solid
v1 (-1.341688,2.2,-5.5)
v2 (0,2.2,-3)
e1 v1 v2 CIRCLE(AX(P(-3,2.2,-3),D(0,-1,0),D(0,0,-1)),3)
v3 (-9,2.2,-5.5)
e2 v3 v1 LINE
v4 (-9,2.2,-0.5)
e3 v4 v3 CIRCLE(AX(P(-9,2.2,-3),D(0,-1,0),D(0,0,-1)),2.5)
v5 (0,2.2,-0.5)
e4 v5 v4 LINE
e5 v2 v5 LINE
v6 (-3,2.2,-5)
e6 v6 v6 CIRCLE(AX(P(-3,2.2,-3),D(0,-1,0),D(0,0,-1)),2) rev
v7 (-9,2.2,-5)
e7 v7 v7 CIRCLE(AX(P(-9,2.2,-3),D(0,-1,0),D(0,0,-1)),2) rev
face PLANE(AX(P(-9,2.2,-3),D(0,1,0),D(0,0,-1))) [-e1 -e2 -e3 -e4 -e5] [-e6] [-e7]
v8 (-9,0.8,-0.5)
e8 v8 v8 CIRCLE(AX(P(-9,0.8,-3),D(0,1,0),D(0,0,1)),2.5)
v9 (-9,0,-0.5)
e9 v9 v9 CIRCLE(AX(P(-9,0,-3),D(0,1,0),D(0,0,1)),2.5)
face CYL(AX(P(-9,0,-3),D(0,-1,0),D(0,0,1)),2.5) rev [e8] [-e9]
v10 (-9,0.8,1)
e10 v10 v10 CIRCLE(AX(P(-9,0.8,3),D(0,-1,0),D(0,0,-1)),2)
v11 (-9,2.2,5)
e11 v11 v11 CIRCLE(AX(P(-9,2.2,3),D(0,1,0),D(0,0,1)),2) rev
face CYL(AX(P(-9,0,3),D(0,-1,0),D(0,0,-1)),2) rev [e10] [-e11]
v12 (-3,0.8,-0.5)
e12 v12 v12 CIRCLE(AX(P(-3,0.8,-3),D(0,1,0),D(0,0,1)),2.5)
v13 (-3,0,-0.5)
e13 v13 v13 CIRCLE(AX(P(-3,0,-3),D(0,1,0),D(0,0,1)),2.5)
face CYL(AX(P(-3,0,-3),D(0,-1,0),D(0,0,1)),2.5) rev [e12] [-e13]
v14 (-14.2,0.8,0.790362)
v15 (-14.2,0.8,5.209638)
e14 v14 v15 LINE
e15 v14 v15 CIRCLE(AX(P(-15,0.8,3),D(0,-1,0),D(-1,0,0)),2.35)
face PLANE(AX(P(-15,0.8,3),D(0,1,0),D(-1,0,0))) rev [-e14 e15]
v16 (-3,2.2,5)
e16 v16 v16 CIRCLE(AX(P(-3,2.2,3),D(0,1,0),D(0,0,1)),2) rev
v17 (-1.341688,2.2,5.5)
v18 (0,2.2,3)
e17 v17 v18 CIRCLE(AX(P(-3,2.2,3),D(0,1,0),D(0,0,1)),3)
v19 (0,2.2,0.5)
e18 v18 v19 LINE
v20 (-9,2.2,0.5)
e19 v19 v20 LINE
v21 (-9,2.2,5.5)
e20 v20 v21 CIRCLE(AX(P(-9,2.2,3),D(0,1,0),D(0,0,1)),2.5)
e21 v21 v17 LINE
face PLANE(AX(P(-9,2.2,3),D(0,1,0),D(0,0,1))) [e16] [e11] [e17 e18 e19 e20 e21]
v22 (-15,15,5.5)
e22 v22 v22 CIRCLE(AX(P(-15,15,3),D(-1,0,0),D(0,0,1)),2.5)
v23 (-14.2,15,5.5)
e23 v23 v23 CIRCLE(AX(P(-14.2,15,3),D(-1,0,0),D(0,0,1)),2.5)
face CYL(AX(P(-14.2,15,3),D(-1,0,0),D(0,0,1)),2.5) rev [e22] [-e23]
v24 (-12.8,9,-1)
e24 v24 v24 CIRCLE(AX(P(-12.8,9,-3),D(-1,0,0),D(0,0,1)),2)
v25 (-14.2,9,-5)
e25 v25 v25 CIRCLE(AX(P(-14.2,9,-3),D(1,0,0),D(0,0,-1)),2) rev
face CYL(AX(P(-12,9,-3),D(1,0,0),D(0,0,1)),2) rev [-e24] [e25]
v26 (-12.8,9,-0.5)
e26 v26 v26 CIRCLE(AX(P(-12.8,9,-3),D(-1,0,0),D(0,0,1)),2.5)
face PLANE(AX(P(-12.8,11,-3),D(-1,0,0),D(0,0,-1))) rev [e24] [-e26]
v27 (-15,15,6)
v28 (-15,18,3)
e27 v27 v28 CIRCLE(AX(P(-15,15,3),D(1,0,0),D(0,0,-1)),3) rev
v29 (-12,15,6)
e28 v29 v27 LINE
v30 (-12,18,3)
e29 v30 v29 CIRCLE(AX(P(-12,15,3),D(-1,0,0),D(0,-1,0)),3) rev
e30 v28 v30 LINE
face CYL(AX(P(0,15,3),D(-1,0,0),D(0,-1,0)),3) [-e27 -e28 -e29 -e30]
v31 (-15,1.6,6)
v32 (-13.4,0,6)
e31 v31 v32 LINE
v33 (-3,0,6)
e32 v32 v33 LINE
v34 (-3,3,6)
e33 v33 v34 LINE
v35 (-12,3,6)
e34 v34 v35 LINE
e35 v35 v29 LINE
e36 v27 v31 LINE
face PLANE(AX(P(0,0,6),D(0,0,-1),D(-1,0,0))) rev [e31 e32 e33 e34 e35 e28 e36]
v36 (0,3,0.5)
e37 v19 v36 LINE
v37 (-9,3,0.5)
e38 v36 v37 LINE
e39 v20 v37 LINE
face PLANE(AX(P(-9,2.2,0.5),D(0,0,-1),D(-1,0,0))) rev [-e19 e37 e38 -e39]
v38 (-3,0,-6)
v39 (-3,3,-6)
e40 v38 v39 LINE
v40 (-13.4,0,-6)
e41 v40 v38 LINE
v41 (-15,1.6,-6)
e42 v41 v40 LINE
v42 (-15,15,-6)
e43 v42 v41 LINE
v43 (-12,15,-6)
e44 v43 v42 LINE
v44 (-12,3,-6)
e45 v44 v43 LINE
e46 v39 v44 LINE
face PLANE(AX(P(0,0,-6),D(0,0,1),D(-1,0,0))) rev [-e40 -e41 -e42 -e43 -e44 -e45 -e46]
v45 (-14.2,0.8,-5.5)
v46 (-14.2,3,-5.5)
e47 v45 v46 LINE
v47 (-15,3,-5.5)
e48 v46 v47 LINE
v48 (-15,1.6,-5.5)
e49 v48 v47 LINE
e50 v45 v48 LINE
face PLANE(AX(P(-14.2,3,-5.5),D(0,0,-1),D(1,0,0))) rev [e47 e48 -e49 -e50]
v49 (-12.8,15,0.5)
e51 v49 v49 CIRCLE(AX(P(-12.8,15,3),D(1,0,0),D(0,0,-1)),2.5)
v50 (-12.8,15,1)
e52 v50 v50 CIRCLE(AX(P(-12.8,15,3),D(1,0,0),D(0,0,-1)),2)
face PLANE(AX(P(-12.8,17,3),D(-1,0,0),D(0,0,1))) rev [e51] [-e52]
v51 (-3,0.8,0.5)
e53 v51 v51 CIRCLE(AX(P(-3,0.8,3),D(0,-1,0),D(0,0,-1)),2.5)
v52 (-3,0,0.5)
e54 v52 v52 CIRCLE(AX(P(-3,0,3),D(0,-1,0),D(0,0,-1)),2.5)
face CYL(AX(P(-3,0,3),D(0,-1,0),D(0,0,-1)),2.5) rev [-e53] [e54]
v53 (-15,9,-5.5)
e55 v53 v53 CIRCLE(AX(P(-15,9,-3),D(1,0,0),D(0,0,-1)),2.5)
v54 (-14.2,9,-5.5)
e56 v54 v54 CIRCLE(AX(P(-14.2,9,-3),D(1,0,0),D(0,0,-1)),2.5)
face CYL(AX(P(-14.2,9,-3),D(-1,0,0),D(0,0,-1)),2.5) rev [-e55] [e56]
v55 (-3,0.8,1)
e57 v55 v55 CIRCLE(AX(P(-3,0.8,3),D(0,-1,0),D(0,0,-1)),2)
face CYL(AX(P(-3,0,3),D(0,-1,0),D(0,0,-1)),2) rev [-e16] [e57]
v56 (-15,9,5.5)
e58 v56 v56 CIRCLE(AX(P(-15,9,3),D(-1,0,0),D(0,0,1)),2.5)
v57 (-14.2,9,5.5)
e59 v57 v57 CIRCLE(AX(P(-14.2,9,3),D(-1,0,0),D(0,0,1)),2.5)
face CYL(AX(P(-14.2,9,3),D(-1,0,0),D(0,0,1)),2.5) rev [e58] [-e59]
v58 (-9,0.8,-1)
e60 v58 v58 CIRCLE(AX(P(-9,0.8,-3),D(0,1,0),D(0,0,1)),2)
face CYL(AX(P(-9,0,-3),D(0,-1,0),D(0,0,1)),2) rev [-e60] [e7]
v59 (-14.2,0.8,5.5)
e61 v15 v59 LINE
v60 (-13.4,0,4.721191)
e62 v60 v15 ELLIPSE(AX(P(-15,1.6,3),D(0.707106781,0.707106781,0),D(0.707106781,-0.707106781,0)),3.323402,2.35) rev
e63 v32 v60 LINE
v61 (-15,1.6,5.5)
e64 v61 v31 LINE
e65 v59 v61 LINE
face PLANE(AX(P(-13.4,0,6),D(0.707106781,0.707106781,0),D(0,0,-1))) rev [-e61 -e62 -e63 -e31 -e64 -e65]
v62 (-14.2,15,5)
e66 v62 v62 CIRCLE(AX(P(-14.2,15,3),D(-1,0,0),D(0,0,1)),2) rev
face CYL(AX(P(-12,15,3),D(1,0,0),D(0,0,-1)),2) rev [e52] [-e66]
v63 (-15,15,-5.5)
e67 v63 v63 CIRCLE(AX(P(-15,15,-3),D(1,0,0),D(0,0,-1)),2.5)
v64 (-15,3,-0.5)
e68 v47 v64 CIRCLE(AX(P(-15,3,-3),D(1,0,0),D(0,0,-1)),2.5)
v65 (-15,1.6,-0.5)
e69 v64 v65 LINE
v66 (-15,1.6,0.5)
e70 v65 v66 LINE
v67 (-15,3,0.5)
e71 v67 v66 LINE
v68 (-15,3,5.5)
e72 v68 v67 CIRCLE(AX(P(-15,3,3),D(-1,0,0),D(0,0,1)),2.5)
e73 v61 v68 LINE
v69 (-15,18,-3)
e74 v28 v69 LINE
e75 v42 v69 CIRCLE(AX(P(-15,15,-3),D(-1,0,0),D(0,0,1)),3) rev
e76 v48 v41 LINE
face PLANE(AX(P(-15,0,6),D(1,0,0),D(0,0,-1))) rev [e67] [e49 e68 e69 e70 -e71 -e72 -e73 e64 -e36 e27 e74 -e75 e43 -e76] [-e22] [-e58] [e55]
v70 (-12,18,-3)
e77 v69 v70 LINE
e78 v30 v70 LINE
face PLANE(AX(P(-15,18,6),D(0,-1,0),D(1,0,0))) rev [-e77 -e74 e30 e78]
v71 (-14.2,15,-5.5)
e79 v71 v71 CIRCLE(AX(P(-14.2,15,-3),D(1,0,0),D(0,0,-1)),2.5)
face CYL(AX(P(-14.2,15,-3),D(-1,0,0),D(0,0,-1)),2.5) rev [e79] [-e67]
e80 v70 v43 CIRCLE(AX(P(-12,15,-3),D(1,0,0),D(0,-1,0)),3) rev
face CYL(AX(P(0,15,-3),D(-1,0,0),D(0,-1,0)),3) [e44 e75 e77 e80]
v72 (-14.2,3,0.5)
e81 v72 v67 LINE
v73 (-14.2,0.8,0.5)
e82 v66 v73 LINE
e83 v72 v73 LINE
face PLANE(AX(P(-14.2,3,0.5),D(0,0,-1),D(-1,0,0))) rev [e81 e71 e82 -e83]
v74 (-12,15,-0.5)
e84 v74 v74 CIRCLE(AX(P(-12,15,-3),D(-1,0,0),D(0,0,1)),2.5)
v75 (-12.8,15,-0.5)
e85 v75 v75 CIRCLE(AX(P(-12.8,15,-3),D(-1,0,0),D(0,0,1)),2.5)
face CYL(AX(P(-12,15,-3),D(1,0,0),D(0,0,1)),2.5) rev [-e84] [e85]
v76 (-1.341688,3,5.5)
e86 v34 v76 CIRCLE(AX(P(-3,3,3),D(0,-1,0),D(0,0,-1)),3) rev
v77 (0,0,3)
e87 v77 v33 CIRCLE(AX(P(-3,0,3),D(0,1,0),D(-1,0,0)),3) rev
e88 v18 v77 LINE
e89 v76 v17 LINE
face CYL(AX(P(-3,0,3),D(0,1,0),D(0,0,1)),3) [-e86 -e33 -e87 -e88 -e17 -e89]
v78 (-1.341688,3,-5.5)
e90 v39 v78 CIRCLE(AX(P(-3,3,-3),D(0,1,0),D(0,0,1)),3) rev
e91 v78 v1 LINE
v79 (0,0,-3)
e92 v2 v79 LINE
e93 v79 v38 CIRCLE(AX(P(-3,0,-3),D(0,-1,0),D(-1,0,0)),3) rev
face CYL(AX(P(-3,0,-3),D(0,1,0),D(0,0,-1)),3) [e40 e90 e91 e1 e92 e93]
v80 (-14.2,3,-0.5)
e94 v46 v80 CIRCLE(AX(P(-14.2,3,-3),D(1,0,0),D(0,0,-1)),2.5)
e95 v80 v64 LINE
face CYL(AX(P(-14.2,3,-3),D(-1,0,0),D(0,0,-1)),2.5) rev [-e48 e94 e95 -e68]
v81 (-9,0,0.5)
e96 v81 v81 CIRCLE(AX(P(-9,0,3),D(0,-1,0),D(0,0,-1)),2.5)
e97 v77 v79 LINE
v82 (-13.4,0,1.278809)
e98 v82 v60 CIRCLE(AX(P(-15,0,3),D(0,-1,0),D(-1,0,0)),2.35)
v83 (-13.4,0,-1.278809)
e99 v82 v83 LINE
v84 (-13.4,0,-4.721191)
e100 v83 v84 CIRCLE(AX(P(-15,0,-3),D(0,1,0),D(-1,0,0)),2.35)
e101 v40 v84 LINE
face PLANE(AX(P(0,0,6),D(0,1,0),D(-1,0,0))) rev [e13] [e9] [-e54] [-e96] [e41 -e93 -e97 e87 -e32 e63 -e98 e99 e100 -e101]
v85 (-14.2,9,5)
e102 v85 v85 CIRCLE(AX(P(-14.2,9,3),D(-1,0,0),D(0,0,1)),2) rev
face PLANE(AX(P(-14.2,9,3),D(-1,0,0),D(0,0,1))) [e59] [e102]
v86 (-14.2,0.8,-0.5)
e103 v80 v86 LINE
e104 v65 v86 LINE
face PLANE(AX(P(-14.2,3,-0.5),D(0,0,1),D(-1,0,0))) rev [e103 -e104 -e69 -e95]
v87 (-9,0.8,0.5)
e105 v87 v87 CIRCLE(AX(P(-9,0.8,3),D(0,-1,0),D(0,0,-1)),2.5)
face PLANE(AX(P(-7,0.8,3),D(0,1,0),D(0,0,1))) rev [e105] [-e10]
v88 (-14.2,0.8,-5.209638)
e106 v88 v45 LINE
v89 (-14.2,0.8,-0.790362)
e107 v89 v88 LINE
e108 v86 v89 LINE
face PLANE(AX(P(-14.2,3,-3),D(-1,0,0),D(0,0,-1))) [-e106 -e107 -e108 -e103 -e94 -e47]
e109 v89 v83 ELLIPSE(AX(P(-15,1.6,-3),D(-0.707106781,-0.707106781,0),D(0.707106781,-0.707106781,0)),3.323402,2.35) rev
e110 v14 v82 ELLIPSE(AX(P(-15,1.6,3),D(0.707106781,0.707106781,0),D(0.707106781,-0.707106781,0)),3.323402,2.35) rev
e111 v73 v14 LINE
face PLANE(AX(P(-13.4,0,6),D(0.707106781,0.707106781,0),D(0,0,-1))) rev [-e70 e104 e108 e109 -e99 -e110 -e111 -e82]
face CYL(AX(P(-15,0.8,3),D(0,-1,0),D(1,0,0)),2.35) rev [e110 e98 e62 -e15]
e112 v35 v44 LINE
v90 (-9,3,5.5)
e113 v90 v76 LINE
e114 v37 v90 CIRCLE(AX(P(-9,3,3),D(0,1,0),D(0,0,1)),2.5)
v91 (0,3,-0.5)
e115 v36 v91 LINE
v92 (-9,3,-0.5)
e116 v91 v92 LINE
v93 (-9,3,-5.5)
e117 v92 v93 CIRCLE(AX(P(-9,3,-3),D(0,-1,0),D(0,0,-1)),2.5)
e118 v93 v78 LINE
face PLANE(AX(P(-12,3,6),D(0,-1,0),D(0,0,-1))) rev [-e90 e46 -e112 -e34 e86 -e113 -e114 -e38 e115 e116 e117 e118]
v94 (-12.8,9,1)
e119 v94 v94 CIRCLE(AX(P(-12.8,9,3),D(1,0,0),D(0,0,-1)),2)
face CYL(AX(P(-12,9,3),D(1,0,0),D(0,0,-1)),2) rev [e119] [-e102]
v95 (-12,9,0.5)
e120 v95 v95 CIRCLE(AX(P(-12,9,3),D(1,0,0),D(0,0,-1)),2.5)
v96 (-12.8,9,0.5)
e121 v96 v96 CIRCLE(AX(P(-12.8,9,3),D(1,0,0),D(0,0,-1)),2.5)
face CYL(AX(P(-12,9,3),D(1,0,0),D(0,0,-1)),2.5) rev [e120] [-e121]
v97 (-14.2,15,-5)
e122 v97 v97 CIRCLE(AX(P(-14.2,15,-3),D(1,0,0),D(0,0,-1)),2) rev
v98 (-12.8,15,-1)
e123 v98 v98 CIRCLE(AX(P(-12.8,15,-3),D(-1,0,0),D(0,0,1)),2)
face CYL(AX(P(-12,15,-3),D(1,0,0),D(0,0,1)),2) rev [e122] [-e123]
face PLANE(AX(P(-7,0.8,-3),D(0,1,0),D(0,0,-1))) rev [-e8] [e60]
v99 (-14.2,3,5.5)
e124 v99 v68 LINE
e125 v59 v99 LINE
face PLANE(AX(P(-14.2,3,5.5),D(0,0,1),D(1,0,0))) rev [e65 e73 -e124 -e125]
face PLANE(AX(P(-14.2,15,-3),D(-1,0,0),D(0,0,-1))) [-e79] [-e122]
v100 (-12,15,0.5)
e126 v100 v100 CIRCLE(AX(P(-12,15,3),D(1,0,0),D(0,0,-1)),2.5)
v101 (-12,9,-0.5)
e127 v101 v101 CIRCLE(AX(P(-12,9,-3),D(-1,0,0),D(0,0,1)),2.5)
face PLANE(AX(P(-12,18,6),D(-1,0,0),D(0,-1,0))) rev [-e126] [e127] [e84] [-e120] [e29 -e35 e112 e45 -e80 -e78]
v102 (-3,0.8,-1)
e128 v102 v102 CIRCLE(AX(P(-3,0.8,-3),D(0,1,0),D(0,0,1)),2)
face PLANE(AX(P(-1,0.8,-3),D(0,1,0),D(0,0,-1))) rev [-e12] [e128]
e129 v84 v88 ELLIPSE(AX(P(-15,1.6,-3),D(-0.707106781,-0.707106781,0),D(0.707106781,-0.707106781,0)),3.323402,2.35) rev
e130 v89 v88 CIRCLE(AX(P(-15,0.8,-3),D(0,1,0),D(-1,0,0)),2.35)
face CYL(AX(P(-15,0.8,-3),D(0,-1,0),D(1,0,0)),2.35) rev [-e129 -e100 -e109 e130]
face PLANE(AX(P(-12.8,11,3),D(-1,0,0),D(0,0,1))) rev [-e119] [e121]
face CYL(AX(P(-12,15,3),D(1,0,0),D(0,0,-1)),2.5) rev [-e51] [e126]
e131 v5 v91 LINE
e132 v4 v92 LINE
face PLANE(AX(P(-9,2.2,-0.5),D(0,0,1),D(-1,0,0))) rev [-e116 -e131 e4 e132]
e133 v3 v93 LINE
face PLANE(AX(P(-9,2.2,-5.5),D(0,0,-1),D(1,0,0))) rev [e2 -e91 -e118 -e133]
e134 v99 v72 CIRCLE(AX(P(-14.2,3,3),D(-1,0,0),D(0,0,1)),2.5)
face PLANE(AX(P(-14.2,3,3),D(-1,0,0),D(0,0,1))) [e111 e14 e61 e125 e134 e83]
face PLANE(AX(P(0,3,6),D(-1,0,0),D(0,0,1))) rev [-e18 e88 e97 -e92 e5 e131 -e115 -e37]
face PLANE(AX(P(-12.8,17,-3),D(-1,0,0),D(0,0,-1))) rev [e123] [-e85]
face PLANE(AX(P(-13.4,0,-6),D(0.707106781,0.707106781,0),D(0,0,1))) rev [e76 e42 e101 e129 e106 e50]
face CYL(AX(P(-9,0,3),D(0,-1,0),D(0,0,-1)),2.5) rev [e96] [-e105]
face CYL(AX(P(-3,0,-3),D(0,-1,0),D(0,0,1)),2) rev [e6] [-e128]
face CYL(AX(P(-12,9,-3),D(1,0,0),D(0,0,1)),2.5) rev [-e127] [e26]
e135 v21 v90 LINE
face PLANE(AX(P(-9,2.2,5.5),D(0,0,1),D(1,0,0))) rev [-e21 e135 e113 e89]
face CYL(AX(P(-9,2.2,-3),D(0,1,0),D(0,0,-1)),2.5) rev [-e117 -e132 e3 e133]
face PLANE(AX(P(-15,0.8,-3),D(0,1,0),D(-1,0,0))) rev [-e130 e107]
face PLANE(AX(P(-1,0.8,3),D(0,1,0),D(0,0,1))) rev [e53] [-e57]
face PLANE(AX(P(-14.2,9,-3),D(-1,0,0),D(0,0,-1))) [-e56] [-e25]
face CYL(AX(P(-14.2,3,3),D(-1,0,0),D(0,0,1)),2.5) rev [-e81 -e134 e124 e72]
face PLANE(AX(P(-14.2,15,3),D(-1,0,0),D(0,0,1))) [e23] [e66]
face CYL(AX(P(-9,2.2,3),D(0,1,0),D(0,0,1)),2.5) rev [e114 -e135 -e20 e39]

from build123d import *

# Parameters (mm, degrees)
BOSS_EXTRUDE1_DEPTH = 6
HOLE1_D             = 4
HOLE1_DEPTH         = 3
HOLE1_CBORE_D       = 5
HOLE1_CBORE_DEPTH   = 0.8
HOLE1_TIP           = 1.201721238
HOLE2_D             = 4
HOLE2_DEPTH         = 18
HOLE2_CBORE_D       = 5
HOLE2_CBORE_DEPTH   = 0.8
HOLE2_TIP           = 1.201721238
CUT_EXTRUDE1_START  = -0.8
CUT_EXTRUDE1_DEPTH  = 0.8
CUT_EXTRUDE2_DEPTH  = 0.8
CUT_EXTRUDE3_START  = -0.8
SKETCH8_R           = 2.5
CUT_EXTRUDE3_DEPTH  = 0.8
CHAMFER1_START      = -12
CHAMFER1_OUTLINE_W  = 5
CHAMFER1_OUTLINE_H  = 6
CHAMFER1_DEPTH      = 2.524769132
FILLET1_R           = 3


with BuildPart() as part:
    # Sketch1 → Boss-Extrude1 (new body)
    with BuildSketch(Plane.XY):
        Polygon((0, 0), (-15, 0), (-15, 18), (-12, 18), (-12, 3), (0, 3), align=None)
    extrude(amount=BOSS_EXTRUDE1_DEPTH)

    # Hole1
    with Locations(Plane(origin=(-12, 0, 0), x_dir=(0, 0, -1), z_dir=(1, 0, 0))):
        with Locations((-3, 9), (-3, 15)):
            CounterBoreHole(HOLE1_D / 2, HOLE1_CBORE_D / 2, HOLE1_CBORE_DEPTH, depth=HOLE1_DEPTH)
            with Locations((0, 0, -(HOLE1_DEPTH + HOLE1_TIP / 2))):  # 118° drill point
                Cone(0, HOLE1_D / 2, HOLE1_TIP, mode=Mode.SUBTRACT)

    # Hole2
    with Locations(Plane(origin=(0, 0, 0), x_dir=(-1, 0, 0), z_dir=(0, -1, 0))):
        with Locations((9, -3), (3, -3)):
            CounterBoreHole(HOLE2_D / 2, HOLE2_CBORE_D / 2, HOLE2_CBORE_DEPTH, depth=HOLE2_DEPTH)
            with Locations((0, 0, -(HOLE2_DEPTH + HOLE2_TIP / 2))):  # 118° drill point
                Cone(0, HOLE2_D / 2, HOLE2_TIP, mode=Mode.SUBTRACT)

    # Sketch6 → Cut-Extrude1 (cut)
    with BuildSketch(Plane(origin=(0, 3, 0), x_dir=(1, 0, 0), z_dir=(0, 1, 0)).offset(CUT_EXTRUDE1_START)):
        with BuildLine():
            Line((-9, -0.5), (0, -0.5))
            Line((0, -0.5), (0, -5.5))
            Line((0, -5.5), (-9, -5.5))
            ThreePointArc((-9, -5.5), (-11.5, -3), (-9, -0.5))
        make_face()
    extrude(amount=CUT_EXTRUDE1_DEPTH, mode=Mode.SUBTRACT)

    # Sketch7 → Cut-Extrude2 (cut)
    with BuildSketch(Plane.XZ):
        with BuildLine():
            Line((-15, 5.35), (-15, 0.65))
            ThreePointArc((-15, 0.65), (-12.65, 3), (-15, 5.35))
        make_face()
    extrude(amount=-CUT_EXTRUDE2_DEPTH, mode=Mode.SUBTRACT)

    # Sketch8 → Cut-Extrude3 (cut)
    with BuildSketch(Plane.ZY.offset(15).offset(CUT_EXTRUDE3_START)):
        with Locations(Location((3, 9, 0), (0, 0, 180))):
            Circle(SKETCH8_R)
        with Locations(Location((3, 15, 0), (0, 0, 180))):
            Circle(SKETCH8_R)
        with BuildLine():
            Line((0.5, 3), (0.5, 0))
            Line((0.5, 0), (5.5, 0))
            Line((5.5, 0), (5.5, 3))
            ThreePointArc((5.5, 3), (3, 5.5), (0.5, 3))
        make_face()
    extrude(amount=CUT_EXTRUDE3_DEPTH, mode=Mode.SUBTRACT)

    # Chamfer1: read off the stored shape, not the designer's step
    # Chamfer1 outline → Chamfer1 (cut)
    with BuildSketch(Plane(origin=(0, 0, 0), x_dir=(0.707106781186546, -0.707106781186549, 0), z_dir=(0.707106781186549, 0.707106781186546, 0)).offset(CHAMFER1_START)):
        with Locations((-10.5, -3)):
            Rectangle(CHAMFER1_OUTLINE_W, CHAMFER1_OUTLINE_H)
    extrude(amount=CHAMFER1_DEPTH, mode=Mode.SUBTRACT)

    # Fillet1
    fillet1_edges = [part.edges().sort_by_distance(p)[0] for p in [
        (0, 1.5, 6),
        (-13.5, 18, 6),
    ]]
    fillet(fillet1_edges, radius=FILLET1_R)

    # Mirror1: part across plane


with BuildPart() as part_1:
    add(part.part)
    add(part.part.mirror(Plane.XY))


solid = part_1.part
